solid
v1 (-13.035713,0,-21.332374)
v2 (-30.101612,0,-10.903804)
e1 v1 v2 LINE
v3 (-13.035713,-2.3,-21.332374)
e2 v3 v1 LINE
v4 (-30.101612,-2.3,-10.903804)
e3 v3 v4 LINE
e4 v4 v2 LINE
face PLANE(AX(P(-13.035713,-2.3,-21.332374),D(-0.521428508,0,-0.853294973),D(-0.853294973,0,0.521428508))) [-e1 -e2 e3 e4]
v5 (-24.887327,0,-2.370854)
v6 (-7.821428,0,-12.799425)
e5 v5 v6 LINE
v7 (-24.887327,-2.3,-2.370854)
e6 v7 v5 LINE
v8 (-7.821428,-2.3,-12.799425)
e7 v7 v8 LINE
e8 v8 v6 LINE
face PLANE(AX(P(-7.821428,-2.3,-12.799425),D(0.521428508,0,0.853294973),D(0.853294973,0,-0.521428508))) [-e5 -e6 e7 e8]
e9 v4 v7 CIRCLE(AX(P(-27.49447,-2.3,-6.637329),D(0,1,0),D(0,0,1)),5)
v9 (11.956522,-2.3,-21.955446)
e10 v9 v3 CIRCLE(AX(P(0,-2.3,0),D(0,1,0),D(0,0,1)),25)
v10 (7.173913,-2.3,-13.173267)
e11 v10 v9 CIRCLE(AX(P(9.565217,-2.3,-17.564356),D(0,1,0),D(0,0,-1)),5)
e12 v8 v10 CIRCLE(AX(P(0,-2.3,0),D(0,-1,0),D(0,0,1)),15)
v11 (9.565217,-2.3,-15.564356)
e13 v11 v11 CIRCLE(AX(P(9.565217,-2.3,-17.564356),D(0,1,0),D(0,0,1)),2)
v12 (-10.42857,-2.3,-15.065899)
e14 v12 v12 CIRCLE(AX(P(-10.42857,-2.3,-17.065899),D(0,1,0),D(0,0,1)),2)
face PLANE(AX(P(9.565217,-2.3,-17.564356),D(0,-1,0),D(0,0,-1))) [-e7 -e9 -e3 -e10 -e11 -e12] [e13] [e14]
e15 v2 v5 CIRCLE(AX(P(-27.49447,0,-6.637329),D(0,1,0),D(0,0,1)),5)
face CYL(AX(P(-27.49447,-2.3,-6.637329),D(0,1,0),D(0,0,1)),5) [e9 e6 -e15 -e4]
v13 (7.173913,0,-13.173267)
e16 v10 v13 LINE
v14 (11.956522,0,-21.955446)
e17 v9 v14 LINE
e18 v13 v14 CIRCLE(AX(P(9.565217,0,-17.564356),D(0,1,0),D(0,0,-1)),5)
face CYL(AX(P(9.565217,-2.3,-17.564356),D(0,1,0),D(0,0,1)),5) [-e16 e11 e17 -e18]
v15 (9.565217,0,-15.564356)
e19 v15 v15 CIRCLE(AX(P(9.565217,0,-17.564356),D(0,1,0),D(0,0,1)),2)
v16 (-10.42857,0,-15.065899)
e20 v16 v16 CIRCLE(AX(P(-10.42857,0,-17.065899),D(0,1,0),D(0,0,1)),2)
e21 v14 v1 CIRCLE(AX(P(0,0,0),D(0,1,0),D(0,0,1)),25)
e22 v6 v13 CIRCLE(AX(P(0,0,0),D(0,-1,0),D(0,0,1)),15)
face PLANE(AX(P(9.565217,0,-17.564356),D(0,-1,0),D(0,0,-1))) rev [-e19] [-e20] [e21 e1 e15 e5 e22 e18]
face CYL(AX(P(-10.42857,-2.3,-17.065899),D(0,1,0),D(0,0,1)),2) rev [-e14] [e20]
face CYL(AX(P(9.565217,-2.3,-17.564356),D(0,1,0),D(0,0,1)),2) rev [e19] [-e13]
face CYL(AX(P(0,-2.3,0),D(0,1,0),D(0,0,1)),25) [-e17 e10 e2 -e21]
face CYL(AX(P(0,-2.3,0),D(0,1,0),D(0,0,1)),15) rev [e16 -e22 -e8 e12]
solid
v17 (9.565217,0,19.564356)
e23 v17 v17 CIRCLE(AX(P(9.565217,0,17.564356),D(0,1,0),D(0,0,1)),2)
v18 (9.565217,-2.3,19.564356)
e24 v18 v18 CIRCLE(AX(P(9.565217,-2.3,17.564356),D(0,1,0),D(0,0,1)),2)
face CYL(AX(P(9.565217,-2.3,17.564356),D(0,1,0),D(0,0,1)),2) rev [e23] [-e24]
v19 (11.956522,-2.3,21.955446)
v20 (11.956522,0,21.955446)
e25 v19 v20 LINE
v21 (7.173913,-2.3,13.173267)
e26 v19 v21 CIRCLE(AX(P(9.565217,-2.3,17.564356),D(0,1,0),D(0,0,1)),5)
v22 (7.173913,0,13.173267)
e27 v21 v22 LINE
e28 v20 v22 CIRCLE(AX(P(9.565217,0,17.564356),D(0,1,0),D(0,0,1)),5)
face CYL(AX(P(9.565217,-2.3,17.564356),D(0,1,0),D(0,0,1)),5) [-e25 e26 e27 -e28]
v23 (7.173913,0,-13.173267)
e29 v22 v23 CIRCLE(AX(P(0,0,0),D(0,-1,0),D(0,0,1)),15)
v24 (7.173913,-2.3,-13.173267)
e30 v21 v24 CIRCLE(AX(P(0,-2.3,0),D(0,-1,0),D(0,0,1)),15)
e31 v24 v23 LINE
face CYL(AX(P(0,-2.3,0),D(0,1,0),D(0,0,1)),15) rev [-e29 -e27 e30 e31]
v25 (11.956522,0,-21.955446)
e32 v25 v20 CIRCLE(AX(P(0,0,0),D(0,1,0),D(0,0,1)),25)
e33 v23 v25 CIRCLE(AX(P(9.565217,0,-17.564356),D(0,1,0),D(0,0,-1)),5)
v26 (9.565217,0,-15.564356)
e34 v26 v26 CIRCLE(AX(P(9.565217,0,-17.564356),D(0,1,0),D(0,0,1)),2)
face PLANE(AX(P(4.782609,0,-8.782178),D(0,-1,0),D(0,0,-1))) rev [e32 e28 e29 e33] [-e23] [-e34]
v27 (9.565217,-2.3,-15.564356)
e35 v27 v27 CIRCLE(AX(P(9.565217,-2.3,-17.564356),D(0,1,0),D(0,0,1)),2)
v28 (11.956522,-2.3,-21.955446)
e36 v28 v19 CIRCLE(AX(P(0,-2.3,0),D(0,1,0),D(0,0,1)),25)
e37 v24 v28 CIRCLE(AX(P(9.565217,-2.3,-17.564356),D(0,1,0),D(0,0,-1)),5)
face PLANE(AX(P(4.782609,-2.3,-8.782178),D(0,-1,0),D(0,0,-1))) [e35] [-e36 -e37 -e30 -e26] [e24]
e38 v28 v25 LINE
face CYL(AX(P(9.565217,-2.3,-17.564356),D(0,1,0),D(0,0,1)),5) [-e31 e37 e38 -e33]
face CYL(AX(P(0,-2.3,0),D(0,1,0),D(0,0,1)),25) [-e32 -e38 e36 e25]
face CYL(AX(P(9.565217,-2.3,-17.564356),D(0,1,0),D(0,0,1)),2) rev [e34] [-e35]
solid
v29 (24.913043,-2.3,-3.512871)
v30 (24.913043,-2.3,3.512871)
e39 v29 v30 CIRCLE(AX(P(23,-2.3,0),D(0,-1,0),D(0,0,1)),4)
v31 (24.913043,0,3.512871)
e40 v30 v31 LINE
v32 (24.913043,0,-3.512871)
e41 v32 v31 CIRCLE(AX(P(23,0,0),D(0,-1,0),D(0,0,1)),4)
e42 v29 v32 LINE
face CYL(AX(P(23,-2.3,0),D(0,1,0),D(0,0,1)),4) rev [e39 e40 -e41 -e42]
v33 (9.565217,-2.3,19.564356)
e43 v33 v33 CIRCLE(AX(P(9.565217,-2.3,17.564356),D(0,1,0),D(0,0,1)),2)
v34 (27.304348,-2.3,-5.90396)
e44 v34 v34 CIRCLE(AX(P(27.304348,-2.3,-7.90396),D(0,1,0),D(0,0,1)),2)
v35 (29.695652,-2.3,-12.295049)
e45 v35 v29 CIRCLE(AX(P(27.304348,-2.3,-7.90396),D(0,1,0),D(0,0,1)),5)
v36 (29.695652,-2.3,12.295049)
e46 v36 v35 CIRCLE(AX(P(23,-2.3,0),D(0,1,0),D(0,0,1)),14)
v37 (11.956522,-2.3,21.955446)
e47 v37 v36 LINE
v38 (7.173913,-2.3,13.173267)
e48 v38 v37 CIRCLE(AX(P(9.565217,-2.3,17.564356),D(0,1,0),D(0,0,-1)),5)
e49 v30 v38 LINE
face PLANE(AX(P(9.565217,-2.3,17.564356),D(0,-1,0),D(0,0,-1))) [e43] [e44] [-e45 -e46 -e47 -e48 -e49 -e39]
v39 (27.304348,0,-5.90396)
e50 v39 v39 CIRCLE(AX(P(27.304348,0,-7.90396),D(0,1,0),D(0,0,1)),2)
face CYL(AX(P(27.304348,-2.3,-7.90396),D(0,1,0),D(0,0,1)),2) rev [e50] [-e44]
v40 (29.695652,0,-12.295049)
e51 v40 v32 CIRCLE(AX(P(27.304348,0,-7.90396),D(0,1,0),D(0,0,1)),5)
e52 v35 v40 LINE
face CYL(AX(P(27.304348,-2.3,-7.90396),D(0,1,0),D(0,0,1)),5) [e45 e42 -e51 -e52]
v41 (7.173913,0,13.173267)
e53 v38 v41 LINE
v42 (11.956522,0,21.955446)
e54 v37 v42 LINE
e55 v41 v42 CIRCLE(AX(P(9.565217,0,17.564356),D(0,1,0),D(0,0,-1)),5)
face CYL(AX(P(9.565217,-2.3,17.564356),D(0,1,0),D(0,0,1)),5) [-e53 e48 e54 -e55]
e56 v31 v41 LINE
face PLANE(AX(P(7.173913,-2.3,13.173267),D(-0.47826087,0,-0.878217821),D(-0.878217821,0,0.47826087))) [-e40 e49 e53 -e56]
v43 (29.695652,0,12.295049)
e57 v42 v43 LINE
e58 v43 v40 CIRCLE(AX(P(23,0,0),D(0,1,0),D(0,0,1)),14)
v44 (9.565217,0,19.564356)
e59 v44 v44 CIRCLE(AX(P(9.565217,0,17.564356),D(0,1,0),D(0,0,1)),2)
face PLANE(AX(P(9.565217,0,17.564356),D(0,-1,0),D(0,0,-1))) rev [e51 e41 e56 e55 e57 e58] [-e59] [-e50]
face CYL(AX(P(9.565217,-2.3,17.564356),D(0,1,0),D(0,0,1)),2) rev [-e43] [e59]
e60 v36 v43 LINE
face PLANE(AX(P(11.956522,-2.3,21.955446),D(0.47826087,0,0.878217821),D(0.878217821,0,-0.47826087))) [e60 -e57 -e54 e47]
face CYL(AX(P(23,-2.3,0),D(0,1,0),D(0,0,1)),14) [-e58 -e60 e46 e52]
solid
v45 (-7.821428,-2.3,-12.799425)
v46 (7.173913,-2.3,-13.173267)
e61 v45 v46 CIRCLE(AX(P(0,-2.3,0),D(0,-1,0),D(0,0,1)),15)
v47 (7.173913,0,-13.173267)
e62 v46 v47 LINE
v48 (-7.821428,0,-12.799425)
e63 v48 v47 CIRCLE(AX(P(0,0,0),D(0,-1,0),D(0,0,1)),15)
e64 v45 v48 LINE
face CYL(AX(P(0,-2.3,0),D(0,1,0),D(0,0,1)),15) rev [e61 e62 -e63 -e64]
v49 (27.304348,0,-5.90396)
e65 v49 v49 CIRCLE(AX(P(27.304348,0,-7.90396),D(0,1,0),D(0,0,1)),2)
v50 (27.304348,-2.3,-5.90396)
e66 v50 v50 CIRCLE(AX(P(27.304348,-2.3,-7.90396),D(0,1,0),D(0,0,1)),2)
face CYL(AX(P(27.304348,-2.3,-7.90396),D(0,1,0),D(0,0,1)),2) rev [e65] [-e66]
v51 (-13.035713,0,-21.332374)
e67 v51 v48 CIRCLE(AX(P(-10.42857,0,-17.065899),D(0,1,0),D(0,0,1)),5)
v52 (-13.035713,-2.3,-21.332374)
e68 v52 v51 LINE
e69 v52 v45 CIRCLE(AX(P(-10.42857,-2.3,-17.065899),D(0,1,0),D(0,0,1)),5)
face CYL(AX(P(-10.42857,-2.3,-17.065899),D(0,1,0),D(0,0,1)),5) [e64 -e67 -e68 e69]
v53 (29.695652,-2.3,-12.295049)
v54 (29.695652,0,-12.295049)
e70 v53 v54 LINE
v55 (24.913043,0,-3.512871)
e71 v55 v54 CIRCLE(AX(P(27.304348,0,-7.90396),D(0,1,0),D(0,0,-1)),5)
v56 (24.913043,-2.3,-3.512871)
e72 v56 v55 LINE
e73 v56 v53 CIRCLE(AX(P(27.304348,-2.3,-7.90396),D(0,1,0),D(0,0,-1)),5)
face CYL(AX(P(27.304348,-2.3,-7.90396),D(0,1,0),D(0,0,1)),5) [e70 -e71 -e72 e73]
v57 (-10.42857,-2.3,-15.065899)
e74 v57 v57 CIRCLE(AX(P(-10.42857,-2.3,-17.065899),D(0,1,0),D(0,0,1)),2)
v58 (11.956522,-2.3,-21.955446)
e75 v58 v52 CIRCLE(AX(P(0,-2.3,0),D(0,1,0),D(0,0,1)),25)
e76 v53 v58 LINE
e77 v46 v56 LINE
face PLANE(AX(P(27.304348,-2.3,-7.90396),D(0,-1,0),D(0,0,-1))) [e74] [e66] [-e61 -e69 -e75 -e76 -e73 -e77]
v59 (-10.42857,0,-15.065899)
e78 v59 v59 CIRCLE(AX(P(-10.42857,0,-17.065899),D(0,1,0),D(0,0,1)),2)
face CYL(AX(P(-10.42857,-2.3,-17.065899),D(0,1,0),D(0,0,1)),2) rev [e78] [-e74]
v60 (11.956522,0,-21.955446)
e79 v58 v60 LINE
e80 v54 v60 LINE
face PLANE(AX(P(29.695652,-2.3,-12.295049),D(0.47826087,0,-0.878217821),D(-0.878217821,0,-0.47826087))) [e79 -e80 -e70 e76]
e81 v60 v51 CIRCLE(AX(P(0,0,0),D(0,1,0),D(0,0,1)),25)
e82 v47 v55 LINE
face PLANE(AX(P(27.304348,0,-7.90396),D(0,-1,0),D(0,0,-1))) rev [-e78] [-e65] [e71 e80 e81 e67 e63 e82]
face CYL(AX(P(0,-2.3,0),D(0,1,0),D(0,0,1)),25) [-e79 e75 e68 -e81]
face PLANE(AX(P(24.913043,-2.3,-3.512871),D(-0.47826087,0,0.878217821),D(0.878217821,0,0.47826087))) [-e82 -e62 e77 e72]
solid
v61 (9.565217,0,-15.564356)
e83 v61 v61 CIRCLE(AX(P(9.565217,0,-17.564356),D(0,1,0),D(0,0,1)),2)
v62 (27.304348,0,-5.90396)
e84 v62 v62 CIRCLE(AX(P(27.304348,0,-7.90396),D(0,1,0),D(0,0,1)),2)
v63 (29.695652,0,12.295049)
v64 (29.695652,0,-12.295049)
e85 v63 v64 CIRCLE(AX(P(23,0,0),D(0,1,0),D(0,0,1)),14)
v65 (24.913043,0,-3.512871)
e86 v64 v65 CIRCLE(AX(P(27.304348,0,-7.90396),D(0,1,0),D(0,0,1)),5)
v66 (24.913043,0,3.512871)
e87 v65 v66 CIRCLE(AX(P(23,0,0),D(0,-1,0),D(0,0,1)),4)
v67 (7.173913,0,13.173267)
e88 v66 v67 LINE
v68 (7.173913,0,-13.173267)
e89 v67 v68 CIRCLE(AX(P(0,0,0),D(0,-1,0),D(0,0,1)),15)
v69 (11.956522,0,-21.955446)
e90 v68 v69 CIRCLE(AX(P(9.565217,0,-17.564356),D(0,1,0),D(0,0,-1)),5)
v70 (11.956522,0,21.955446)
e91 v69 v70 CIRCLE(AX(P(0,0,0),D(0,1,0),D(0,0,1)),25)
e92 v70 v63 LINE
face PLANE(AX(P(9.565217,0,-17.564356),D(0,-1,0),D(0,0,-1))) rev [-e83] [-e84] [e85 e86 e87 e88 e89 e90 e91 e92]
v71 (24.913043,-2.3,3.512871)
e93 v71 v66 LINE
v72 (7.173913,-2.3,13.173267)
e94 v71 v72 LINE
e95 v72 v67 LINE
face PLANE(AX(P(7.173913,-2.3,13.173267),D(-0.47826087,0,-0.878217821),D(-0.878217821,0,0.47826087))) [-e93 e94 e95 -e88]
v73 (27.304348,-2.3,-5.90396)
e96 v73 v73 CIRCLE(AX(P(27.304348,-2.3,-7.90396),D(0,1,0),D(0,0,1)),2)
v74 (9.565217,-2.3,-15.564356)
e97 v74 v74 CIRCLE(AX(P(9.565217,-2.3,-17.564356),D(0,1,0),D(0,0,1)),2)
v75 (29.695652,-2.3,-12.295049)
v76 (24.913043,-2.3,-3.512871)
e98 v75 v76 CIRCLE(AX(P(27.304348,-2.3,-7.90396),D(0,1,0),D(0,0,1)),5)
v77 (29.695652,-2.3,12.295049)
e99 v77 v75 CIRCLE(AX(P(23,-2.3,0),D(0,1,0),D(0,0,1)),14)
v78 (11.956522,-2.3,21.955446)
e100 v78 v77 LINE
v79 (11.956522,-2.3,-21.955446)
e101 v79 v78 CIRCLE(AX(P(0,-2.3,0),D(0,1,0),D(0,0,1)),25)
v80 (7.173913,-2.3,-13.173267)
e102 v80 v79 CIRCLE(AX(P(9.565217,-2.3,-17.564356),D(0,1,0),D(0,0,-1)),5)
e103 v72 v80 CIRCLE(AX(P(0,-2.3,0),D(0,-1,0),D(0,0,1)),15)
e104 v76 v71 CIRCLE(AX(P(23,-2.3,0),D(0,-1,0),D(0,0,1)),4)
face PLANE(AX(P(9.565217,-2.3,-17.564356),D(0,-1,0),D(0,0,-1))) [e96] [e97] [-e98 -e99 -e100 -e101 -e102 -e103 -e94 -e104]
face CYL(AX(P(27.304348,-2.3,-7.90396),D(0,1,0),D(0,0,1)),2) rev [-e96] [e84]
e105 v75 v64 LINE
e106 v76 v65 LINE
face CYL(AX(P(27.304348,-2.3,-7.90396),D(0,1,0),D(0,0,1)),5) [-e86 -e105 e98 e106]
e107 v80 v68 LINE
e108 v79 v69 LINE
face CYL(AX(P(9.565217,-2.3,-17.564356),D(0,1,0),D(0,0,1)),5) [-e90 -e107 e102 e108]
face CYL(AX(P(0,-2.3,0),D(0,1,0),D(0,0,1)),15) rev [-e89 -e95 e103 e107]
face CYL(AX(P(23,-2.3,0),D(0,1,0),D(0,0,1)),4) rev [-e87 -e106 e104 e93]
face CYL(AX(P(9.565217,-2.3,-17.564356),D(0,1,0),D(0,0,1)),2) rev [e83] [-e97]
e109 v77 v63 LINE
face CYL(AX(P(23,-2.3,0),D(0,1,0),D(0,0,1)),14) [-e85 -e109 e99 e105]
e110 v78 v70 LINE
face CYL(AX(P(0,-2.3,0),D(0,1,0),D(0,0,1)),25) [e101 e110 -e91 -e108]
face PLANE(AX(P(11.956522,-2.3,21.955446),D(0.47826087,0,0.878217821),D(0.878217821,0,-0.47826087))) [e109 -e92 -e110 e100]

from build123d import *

# Parameters (mm, degrees)
SKETCH8_R          = 2
BASE_FLANGE2_DEPTH = 2.3
SKETCH14_R         = 2
BASE_FLANGE4_DEPTH = 2.3
SKETCH17_R         = 2
BASE_FLANGE5_DEPTH = 2.3
SKETCH11_R         = 2
BASE_FLANGE6_DEPTH = 2.3
SKETCH23_R         = 2
BASE_FLANGE7_DEPTH = 2.3


# Sheet-metal steps are written as plain solids
with BuildPart() as part:
    # Sketch8 → Base-Flange2 (new body)
    with BuildSketch(Plane(origin=(0, 0, 0), x_dir=(1, 0, 0), z_dir=(0, 1, 0))):
        with BuildLine():
            ThreePointArc((11.956521739, 21.955445518), (-25, 0), (11.956521739, -21.955445518))
            ThreePointArc((11.956521739, -21.955445518), (13.956306495, -15.173052067), (7.173913043, -13.173267311))
            ThreePointArc((7.173913043, -13.173267311), (-15, 0), (7.173913043, 13.173267311))
            ThreePointArc((7.173913043, 13.173267311), (13.956306495, 15.173052067), (11.956521739, 21.955445518))
        make_face()
        with Locations(Location((9.565217391, 17.564356415, 0), (0, 0, 270))):
            Circle(SKETCH8_R, mode=Mode.SUBTRACT)
        with Locations(Location((9.565217391, -17.564356415, 0), (0, 0, 270))):
            Circle(SKETCH8_R, mode=Mode.SUBTRACT)
    extrude(amount=-BASE_FLANGE2_DEPTH)


with BuildPart() as body_2:
    # Sketch14 → Base-Flange4 (new body)
    with BuildSketch(Plane(origin=(0, 0, 0), x_dir=(1, 0, 0), z_dir=(0, 1, 0))):
        with BuildLine():
            Line((29.695652174, 12.29504949), (11.956521739, 21.955445518))
            ThreePointArc((11.956521739, 21.955445518), (-0.623071192, 24.99223444), (-13.035712701, 21.332374326))
            ThreePointArc((-13.035712701, 21.332374326), (-14.695045026, 14.458756921), (-7.82142762, 12.799424596))
            ThreePointArc((-7.82142762, 12.799424596), (-0.373842715, 14.995340664), (7.173913043, 13.173267311))
            Line((7.173913043, 13.173267311), (24.913043478, 3.512871283))
            ThreePointArc((24.913043478, 3.512871283), (31.69543693, 5.512656039), (29.695652174, 12.29504949))
        make_face()
        with Locations(Location((-10.42857016, 17.065899461, 0), (0, 0, 270))):
            Circle(SKETCH14_R, mode=Mode.SUBTRACT)
        with Locations(Location((27.304347826, 7.903960387, 0), (0, 0, 270))):
            Circle(SKETCH14_R, mode=Mode.SUBTRACT)
    extrude(amount=-BASE_FLANGE4_DEPTH)


with BuildPart() as body_3:
    # Sketch17 → Base-Flange5 (new body)
    with BuildSketch(Plane(origin=(0, 0, 0), x_dir=(1, 0, 0), z_dir=(0, 1, 0))):
        with BuildLine():
            Line((-13.035712701, 21.332374326), (-30.101612161, 10.903804166))
            ThreePointArc((-30.101612161, 10.903804166), (-31.760944487, 4.03018676), (-24.887327081, 2.370854435))
            Line((-24.887327081, 2.370854435), (-7.82142762, 12.799424596))
            ThreePointArc((-7.82142762, 12.799424596), (-0.373842715, 14.995340664), (7.173913043, 13.173267311))
            ThreePointArc((7.173913043, 13.173267311), (13.956306495, 15.173052067), (11.956521739, 21.955445518))
            ThreePointArc((11.956521739, 21.955445518), (-0.623071192, 24.99223444), (-13.035712701, 21.332374326))
        make_face()
        with Locations(Location((9.565217391, 17.564356415, 0), (0, 0, 270))):
            Circle(SKETCH17_R, mode=Mode.SUBTRACT)
        with Locations(Location((-10.42857016, 17.065899461, 0), (0, 0, 270))):
            Circle(SKETCH17_R, mode=Mode.SUBTRACT)
    extrude(amount=-BASE_FLANGE5_DEPTH)


with BuildPart() as body_4:
    # Sketch11 → Base-Flange6 (new body)
    with BuildSketch(Plane(origin=(0, 0, 0), x_dir=(1, 0, 0), z_dir=(0, 1, 0))):
        with BuildLine():
            Line((11.956521739, -21.955445518), (29.695652174, -12.29504949))
            ThreePointArc((29.695652174, -12.29504949), (37, 0), (29.695652174, 12.29504949))
            ThreePointArc((29.695652174, 12.29504949), (22.913258722, 10.295264734), (24.913043478, 3.512871283))
            ThreePointArc((24.913043478, 3.512871283), (27, 0), (24.913043478, -3.512871283))
            Line((24.913043478, -3.512871283), (7.173913043, -13.173267311))
            ThreePointArc((7.173913043, -13.173267311), (5.174128288, -19.955660762), (11.956521739, -21.955445518))
        make_face()
        with Locations(Location((27.304347826, 7.903960387, 0), (0, 0, 270))):
            Circle(SKETCH11_R, mode=Mode.SUBTRACT)
        with Locations(Location((9.565217391, -17.564356415, 0), (0, 0, 270))):
            Circle(SKETCH11_R, mode=Mode.SUBTRACT)
    extrude(amount=-BASE_FLANGE6_DEPTH)


with BuildPart() as body_5:
    # Sketch23 → Base-Flange7 (new body)
    with BuildSketch(Plane(origin=(0, 0, 0), x_dir=(1, 0, 0), z_dir=(0, 1, 0))):
        with BuildLine():
            Line((11.956521739, -21.955445518), (29.695652174, -12.29504949))
            ThreePointArc((29.695652174, -12.29504949), (37, 0), (29.695652174, 12.29504949))
            ThreePointArc((29.695652174, 12.29504949), (22.913258722, 10.295264734), (24.913043478, 3.512871283))
            ThreePointArc((24.913043478, 3.512871283), (27, 0), (24.913043478, -3.512871283))
            Line((24.913043478, -3.512871283), (7.173913043, -13.173267311))
            ThreePointArc((7.173913043, -13.173267311), (-15, 0), (7.173913043, 13.173267311))
            ThreePointArc((7.173913043, 13.173267311), (13.956306495, 15.173052067), (11.956521739, 21.955445518))
            ThreePointArc((11.956521739, 21.955445518), (-25, 0), (11.956521739, -21.955445518))
        make_face()
        with Locations(Location((9.565217391, 17.564356415, 0), (0, 0, 270))):
            Circle(SKETCH23_R, mode=Mode.SUBTRACT)
        with Locations(Location((27.304347826, 7.903960387, 0), (0, 0, 270))):
            Circle(SKETCH23_R, mode=Mode.SUBTRACT)
    extrude(amount=-BASE_FLANGE7_DEPTH)


solid = Compound([part.part, body_2.part, body_3.part, body_4.part, body_5.part])
